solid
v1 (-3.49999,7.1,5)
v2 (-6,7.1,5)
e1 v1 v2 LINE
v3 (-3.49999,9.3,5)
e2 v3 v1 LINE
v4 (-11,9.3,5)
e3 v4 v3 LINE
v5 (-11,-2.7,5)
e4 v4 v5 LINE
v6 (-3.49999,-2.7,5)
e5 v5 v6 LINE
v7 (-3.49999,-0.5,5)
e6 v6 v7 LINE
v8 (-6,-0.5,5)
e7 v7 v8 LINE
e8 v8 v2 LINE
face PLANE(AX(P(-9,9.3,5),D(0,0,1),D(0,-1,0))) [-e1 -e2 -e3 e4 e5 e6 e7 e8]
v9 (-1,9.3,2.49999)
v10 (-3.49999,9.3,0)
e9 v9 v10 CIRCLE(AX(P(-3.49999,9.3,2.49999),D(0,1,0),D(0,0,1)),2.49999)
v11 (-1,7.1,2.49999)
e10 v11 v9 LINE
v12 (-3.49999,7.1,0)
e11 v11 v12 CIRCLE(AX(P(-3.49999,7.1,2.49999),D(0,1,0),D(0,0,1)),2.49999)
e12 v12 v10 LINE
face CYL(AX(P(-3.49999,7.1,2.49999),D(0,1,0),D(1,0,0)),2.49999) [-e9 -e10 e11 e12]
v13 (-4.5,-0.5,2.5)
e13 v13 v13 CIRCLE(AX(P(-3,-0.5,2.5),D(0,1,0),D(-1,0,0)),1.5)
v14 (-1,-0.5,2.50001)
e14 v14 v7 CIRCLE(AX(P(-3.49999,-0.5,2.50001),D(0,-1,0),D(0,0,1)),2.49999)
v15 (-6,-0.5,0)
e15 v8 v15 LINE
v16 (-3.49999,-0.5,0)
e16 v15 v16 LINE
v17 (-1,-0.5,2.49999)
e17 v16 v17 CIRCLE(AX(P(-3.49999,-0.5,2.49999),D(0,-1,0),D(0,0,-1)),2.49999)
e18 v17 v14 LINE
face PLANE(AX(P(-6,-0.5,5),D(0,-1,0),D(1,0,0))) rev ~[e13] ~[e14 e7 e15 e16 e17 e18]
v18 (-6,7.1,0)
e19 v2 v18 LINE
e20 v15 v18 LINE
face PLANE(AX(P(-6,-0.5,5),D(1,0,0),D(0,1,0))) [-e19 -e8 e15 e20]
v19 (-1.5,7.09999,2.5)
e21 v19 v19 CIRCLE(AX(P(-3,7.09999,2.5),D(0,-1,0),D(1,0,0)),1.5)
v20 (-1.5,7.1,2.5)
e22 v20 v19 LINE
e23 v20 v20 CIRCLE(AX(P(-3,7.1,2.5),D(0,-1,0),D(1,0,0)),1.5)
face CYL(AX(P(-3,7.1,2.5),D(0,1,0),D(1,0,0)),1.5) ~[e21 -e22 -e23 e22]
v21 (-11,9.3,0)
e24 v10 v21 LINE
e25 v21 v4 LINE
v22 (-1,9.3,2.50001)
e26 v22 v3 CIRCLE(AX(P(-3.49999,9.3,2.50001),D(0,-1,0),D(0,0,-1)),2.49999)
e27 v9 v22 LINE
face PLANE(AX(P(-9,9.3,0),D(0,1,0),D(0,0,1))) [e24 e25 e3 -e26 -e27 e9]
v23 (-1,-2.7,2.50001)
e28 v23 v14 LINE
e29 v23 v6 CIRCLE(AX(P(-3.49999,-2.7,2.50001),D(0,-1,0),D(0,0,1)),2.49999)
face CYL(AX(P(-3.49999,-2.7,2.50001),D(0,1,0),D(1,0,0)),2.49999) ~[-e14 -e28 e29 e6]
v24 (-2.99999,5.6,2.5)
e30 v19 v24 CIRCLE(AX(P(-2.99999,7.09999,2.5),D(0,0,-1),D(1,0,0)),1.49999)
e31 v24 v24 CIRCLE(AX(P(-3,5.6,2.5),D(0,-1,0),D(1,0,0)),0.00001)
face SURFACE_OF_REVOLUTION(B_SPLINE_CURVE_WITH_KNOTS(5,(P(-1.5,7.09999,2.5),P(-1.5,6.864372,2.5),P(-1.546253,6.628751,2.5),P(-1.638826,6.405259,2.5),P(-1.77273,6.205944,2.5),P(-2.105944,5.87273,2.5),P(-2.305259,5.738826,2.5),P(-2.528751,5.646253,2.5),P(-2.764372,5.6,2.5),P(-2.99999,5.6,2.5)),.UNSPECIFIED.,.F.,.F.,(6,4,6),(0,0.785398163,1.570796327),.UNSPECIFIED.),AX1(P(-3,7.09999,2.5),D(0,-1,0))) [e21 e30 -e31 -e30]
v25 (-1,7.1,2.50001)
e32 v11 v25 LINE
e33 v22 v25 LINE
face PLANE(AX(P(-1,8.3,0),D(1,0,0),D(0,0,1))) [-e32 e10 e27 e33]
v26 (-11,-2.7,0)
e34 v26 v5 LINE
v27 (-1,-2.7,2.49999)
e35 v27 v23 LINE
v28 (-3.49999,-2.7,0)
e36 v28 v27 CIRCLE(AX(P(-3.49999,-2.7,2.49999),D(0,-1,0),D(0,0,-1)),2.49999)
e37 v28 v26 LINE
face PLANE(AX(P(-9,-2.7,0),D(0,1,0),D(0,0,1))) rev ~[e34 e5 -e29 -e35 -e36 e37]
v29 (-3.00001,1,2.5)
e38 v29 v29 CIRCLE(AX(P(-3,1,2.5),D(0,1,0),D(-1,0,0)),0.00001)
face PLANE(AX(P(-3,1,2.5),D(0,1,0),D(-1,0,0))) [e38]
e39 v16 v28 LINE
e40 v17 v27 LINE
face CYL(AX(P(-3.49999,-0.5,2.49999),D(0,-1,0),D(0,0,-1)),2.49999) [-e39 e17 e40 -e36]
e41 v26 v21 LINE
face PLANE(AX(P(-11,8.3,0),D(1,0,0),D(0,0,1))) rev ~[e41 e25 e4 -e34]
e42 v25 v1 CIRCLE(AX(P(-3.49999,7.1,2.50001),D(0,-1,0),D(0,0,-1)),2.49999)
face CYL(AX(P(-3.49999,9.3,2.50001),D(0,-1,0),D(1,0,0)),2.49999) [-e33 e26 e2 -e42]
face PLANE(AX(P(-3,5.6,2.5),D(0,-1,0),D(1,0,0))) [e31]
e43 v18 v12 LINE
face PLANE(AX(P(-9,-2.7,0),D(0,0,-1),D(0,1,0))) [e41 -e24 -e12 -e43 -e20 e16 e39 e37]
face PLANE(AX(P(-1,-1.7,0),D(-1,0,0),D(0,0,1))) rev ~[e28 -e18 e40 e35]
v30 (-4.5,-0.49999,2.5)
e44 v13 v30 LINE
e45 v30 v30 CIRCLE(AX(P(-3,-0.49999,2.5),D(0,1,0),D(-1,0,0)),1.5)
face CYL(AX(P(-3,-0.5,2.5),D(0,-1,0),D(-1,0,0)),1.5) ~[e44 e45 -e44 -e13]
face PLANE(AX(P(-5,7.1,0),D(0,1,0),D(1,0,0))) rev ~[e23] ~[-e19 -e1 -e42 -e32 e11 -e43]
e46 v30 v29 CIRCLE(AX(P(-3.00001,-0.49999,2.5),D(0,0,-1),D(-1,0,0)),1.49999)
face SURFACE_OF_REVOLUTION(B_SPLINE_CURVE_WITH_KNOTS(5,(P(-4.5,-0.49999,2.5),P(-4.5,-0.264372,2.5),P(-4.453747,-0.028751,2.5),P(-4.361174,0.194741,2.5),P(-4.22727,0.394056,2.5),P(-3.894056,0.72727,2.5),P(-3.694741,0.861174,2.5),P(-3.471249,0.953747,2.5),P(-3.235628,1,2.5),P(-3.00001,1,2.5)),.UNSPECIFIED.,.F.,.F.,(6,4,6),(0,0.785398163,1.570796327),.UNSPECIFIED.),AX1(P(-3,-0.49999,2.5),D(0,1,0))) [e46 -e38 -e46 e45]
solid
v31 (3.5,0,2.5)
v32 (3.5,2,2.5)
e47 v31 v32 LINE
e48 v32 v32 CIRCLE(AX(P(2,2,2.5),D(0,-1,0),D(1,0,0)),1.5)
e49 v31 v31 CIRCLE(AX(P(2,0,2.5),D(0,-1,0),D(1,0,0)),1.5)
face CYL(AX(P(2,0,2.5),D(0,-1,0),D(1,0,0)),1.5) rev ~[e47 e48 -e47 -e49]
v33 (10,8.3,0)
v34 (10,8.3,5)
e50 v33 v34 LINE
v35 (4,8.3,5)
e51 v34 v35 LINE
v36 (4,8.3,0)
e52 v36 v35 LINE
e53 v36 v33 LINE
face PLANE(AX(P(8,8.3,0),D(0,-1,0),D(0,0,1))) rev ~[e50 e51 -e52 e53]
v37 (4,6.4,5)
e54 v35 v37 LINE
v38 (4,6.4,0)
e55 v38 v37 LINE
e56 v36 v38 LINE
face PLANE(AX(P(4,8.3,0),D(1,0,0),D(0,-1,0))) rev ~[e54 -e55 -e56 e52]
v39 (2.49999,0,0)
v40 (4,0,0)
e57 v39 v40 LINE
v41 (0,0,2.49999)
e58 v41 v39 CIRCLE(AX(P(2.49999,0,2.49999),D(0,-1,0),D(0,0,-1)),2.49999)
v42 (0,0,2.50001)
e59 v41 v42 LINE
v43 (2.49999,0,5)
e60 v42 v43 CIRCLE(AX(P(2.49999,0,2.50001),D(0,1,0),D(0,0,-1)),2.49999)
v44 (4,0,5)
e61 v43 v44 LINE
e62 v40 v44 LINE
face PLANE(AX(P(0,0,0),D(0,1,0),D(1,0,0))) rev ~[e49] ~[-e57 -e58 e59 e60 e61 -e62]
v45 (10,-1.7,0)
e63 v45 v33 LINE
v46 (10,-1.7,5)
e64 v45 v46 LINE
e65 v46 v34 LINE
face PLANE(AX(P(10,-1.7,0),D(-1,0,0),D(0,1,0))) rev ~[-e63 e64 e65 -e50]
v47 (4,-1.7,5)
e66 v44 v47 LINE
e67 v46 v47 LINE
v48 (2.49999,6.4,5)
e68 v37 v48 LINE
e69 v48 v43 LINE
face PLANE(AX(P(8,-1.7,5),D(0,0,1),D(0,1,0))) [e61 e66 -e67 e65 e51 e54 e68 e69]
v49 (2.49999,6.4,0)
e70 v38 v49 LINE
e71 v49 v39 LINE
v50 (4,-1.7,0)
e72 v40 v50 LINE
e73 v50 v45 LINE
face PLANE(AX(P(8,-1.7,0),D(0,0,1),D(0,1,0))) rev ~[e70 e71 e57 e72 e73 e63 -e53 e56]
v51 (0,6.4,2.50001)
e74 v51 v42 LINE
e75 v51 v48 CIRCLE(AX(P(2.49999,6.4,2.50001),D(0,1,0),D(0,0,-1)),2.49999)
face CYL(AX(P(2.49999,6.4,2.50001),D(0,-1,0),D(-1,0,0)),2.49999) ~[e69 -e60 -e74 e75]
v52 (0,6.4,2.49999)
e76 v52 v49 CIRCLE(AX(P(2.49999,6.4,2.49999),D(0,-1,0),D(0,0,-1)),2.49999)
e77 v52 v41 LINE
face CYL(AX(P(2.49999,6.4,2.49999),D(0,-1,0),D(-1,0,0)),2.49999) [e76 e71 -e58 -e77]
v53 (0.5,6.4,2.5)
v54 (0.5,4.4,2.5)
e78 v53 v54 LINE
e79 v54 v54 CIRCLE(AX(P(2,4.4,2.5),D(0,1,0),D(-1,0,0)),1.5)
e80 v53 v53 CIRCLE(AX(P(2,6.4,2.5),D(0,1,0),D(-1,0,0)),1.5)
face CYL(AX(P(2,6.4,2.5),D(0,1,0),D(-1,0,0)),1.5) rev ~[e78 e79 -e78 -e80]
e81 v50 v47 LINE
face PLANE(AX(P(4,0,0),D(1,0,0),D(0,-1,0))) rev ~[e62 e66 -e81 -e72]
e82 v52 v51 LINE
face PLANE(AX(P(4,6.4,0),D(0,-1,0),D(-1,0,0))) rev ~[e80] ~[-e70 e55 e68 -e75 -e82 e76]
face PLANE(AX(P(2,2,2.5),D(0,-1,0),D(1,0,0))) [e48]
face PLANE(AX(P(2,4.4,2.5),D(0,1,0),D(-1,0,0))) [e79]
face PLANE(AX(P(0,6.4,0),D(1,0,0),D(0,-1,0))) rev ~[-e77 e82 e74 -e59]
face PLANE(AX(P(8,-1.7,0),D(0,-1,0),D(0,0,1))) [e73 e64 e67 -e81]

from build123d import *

# Parameters (mm, degrees)
F1_DEPTH  = 5
F2_R      = 1.5
F3_DEPTH  = 1.5
F4_R      = 1.5
F5_DEPTH  = 2
F6_R      = 1.5
F7_DEPTH  = 1.5
F8_R      = 1.49999
F9_W      = 1
F9_H      = 7.6
F10_DEPTH = 5
F11_DEPTH = 1
F12_DEPTH = 1
F13_R     = 2.49999
F13_2_R   = 2.49999
F14_DEPTH = 2
F15_DEPTH = 2
F16_R     = 1.5
F17_DEPTH = 2


# Not quite as in the source:
# - a fillet or chamfer is up to 0.001 mm smaller than in the source, because OpenCascade refuses the exact size


with BuildPart() as f1:
    # F0 (on Top) → F1 (new body)
    with BuildSketch(Plane.XY):
        Polygon((0, 6.4), (0, 0), (4, 0), (4, -1.7), (8, -1.7), (8, 8.3), (4, 8.3), (4, 6.4), align=None)
    extrude(amount=F1_DEPTH)

    # F4 (on face) → F5 (cut)
    with BuildSketch(Plane(origin=(0, 6.4, 0), x_dir=(-1, 0, 0), z_dir=(0, 1, 0))):
        with Locations((-2, 2.5)):
            Circle(F4_R)
    extrude(amount=-F5_DEPTH, mode=Mode.SUBTRACT)

    # F13 (radius 2.5 in the source; OpenCascade refuses exactly that, so slightly less here)
    f13_edges = [f1.edges().sort_by_distance(p)[0] for p in [
        (0, 3.2, 5),
        (0, 3.2, 0),
    ]]
    fillet(f13_edges, radius=F13_R)

    # F14 (add): a face of the model
    f14_faces = [f1.faces().sort_by_distance(p)[0] for p in [
        (8, 3.3, 2.5),
    ]]
    extrude(f14_faces, amount=F14_DEPTH)

    # F16 (on face) → F17 (cut)
    with BuildSketch(Plane.XZ):
        with Locations((2, 2.5)):
            Circle(F16_R)
    extrude(amount=-F17_DEPTH, mode=Mode.SUBTRACT)


with BuildPart() as f1b:
    # F0 (on Top) → F1, piece 2 (new body)
    with BuildSketch(Plane.XY):
        Polygon((-5, 7.1), (-1, 7.1), (-1, 8.3), (-9, 8.3), (-9, -1.7), (-1, -1.7), (-1, -0.5), (-5, -0.5), align=None)
    extrude(amount=F1_DEPTH)

    # F2 (on face) → F3 (join)
    with BuildSketch(Plane.XZ.offset(-7.1)):
        with Locations((-3, 2.5)):
            Circle(F2_R)
    extrude(amount=F3_DEPTH)

    # F6 (on face) → F7 (join)
    with BuildSketch(Plane(origin=(0, -0.5, 0), x_dir=(-1, 0, 0), z_dir=(0, 1, 0))):
        with Locations((3, 2.5)):
            Circle(F6_R)
    extrude(amount=F7_DEPTH)

    # F8 (radius 1.5 in the source; OpenCascade refuses exactly that, so slightly less here)
    f8_edges = [f1b.edges().sort_by_distance(p)[0] for p in [
        (-1.5, 1, 2.5),
        (-4.5, 5.6, 2.5),
    ]]
    fillet(f8_edges, radius=F8_R)

    # F9 (on face) → F10 (cut, through all)
    with BuildSketch(Plane.XY.offset(5)):
        with Locations((-5.5, 3.3)):
            Rectangle(F9_W, F9_H)
    extrude(amount=-F10_DEPTH, mode=Mode.SUBTRACT)

    # F11 (add): a face of the model
    f11_faces = [f1b.faces().sort_by_distance(p)[0] for p in [
        (-5, -1.7, 2.5),
    ]]
    extrude(f11_faces, amount=F11_DEPTH)

    # F12 (add): a face of the model
    f12_faces = [f1b.faces().sort_by_distance(p)[0] for p in [
        (-5, 8.3, 2.5),
    ]]
    extrude(f12_faces, amount=F12_DEPTH)

    # F13#2 (radius 2.5 in the source; OpenCascade refuses exactly that, so slightly less here)
    f13_2_edges = [f1b.edges().sort_by_distance(p)[0] for p in [
        (-1, -1.6, 0),
        (-1, -1.6, 5),
        (-1, 8.2, 5),
        (-1, 8.2, 0),
    ]]
    fillet(f13_2_edges, radius=F13_2_R)

    # F15 (add): a face of the model
    f15_faces = [f1b.faces().sort_by_distance(p)[0] for p in [
        (-9, 3.3, 2.5),
    ]]
    extrude(f15_faces, amount=F15_DEPTH)


solid = Compound([f1.part, f1b.part])
